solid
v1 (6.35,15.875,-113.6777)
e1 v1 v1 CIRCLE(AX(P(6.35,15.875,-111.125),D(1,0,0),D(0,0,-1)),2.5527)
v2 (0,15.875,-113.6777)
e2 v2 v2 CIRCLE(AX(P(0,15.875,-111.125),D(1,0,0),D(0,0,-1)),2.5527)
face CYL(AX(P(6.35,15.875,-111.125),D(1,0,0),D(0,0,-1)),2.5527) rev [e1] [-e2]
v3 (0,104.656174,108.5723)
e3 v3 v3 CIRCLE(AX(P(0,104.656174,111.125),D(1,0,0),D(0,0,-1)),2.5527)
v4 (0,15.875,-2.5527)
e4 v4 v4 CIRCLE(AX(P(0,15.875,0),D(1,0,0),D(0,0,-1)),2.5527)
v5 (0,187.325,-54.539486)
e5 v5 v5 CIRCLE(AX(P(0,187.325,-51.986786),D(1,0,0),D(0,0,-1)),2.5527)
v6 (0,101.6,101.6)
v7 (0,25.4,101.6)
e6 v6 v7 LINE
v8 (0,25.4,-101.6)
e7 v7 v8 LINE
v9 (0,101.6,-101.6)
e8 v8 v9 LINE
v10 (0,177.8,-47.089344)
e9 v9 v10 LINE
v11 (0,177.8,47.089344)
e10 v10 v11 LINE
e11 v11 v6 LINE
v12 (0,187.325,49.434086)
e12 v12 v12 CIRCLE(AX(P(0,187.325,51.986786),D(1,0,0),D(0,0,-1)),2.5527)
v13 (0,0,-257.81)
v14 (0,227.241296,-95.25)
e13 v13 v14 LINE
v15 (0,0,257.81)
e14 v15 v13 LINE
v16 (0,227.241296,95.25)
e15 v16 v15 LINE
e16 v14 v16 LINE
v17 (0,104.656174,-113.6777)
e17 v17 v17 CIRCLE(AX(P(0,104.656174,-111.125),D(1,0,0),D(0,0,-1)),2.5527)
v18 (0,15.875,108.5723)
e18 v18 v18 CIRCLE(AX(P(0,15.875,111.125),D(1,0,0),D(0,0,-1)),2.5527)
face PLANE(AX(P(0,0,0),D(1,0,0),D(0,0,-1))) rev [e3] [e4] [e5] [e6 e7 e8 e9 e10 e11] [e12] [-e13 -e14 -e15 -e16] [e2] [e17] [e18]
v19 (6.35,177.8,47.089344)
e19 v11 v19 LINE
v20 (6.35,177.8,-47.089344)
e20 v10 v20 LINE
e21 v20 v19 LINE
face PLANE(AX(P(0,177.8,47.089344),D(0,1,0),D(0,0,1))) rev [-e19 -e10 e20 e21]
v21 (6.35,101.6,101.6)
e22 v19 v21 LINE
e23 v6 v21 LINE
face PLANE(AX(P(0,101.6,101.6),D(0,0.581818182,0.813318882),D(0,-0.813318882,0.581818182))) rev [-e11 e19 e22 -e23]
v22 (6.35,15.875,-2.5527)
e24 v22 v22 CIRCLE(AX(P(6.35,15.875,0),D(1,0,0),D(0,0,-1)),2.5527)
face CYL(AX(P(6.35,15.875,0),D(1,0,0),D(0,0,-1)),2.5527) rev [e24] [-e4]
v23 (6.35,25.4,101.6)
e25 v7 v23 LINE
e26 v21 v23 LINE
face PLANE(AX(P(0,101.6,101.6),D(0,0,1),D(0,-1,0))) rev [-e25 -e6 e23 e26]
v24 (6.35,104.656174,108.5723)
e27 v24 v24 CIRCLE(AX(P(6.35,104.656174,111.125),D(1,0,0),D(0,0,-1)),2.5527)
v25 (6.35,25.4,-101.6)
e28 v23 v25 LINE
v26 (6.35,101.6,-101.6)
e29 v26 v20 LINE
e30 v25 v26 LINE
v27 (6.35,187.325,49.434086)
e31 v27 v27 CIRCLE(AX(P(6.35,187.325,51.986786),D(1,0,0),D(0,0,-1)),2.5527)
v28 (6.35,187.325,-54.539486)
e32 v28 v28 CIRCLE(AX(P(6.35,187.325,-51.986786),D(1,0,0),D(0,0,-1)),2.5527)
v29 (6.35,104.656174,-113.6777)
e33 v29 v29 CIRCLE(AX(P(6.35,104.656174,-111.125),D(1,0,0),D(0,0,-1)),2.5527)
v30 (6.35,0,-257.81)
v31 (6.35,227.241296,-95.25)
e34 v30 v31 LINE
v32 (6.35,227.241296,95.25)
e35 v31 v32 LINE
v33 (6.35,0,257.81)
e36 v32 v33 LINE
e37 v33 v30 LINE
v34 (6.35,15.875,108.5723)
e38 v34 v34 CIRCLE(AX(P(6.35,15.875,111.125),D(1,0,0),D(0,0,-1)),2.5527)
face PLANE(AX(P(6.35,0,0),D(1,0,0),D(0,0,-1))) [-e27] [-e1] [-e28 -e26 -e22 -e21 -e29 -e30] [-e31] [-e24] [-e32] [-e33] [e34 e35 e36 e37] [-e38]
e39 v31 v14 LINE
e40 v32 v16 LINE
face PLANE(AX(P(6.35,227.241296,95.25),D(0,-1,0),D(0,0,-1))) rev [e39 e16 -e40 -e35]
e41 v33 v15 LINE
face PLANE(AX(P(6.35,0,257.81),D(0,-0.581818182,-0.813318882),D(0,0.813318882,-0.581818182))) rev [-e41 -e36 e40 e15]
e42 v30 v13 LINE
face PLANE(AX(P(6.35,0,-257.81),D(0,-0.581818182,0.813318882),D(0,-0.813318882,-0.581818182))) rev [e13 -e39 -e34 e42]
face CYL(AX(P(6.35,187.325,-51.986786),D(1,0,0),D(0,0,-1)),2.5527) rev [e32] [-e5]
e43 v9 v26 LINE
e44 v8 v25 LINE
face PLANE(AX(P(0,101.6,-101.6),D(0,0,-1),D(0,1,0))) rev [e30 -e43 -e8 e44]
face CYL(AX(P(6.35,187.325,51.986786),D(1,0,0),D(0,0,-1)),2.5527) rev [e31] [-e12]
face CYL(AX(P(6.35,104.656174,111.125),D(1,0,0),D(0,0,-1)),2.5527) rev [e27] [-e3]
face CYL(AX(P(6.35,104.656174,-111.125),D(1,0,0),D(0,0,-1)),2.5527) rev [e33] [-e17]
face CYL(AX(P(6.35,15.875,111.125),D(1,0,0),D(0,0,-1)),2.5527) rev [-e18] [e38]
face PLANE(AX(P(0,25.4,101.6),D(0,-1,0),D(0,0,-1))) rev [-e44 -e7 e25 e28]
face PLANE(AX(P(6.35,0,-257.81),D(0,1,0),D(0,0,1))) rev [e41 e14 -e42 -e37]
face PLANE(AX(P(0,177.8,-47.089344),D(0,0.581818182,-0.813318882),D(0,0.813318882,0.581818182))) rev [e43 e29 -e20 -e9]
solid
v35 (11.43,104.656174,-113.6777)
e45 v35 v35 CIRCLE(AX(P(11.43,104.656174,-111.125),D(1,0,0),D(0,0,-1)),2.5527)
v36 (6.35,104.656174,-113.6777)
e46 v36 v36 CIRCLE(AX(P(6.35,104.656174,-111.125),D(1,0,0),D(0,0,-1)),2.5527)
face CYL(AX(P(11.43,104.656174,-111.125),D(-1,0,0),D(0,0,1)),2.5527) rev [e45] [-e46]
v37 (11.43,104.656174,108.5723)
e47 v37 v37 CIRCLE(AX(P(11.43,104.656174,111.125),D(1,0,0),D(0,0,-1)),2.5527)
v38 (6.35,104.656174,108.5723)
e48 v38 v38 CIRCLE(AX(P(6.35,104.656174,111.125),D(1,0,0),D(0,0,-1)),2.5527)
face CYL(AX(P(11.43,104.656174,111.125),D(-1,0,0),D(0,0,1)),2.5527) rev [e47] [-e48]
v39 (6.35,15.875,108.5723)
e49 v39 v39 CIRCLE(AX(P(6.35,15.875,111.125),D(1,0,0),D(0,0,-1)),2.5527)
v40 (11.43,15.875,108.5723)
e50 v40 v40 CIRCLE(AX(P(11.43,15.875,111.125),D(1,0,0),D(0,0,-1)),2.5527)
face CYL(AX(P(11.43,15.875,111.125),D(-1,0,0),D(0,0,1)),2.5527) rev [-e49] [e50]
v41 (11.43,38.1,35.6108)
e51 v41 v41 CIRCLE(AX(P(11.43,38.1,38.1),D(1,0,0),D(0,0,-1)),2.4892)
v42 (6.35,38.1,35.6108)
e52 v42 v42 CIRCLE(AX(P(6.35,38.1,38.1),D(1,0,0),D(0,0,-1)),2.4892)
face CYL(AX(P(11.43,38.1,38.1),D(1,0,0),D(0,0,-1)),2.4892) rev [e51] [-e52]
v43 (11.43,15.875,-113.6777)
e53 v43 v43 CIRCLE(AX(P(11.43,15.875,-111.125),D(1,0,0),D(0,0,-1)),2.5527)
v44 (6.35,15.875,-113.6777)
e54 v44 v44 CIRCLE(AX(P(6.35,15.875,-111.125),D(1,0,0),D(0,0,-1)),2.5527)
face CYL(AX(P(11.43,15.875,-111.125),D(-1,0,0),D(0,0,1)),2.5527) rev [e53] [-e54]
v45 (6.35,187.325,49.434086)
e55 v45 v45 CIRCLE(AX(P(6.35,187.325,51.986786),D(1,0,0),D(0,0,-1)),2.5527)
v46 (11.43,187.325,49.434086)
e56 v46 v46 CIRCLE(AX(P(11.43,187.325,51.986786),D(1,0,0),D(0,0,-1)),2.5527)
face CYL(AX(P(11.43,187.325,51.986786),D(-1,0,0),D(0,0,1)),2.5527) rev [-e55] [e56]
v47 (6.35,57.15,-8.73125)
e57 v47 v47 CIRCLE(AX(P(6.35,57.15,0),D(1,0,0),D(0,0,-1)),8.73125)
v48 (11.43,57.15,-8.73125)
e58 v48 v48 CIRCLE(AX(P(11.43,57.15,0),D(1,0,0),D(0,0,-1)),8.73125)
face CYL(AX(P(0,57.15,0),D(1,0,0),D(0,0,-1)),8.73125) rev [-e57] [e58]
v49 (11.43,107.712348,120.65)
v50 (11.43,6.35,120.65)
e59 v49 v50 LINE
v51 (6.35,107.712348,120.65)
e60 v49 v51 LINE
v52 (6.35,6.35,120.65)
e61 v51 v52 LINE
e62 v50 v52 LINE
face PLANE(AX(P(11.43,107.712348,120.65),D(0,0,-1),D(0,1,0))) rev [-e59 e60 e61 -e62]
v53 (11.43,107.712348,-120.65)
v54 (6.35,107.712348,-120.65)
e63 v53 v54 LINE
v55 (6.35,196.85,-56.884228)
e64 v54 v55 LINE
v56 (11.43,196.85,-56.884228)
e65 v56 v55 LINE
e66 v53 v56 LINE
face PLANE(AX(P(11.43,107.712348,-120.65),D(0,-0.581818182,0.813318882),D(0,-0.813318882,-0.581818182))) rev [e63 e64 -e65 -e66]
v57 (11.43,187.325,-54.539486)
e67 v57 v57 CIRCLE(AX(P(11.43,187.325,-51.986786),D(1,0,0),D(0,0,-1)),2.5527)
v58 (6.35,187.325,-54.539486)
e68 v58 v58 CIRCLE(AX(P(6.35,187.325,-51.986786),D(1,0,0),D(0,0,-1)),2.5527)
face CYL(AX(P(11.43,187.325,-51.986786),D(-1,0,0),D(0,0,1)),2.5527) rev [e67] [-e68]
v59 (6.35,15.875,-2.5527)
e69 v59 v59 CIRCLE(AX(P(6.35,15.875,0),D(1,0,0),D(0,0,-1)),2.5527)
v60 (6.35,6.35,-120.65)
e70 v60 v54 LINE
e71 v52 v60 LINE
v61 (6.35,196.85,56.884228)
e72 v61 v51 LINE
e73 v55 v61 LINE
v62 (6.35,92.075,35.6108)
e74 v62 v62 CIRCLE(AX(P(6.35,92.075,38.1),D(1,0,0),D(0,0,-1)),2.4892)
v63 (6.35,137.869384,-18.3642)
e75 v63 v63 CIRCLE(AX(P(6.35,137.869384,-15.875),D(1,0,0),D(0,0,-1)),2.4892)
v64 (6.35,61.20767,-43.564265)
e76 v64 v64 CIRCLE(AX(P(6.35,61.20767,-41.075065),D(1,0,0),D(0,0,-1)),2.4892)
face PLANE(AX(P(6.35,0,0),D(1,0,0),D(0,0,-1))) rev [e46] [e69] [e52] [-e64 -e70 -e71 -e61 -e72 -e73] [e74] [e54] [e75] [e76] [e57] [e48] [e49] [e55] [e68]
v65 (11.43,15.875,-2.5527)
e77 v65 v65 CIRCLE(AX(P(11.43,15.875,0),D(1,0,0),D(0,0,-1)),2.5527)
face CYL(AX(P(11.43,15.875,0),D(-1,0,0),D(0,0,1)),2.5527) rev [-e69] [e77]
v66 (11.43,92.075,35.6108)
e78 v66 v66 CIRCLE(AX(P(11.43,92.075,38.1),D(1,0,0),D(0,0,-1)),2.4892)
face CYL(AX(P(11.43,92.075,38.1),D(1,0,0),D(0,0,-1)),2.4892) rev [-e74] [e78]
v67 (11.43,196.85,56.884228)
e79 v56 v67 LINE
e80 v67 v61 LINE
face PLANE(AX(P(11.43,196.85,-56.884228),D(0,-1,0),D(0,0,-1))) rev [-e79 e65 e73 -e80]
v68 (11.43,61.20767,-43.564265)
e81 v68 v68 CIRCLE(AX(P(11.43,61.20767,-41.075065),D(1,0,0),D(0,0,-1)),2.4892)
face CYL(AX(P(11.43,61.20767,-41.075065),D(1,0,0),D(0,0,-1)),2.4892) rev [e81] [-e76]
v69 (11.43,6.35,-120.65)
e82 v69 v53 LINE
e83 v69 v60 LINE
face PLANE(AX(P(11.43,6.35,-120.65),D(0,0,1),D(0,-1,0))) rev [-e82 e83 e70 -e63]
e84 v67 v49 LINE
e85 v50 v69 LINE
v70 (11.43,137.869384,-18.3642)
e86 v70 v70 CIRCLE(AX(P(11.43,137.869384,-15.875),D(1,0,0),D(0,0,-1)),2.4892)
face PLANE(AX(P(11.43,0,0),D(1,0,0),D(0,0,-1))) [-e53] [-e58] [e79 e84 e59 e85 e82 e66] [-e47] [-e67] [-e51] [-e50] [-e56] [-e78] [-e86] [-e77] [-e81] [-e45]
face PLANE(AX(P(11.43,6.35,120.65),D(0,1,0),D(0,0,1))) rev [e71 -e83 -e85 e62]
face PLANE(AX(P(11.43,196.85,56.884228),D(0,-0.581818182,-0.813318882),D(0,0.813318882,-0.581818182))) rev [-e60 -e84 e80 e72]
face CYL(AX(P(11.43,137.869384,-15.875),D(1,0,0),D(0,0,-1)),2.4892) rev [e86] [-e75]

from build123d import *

# Parameters (mm, degrees)
ANGLEDBALLAST_DECKFRONT_OUTLINE_R = 2.5527
ANGLEDBALLAST_DECKFRONT_DEPTH     = 6.35
SKETCH1_R                         = 2.5527
BOSS_EXTRUDE1_DEPTH               = 5.08
SKETCH2_R                         = 8.73125
CUT_EXTRUDE1_DEPTH                = 344.853526084
F_10_CLEARANCE_HOLE1_AT_2_COUNT   = 2
F_10_CLEARANCE_HOLE1_AT_2_PITCH   = 53.975
F_10_CLEARANCE_HOLE1_AT_3_COUNT   = 2
F_10_CLEARANCE_HOLE1_AT_3_PITCH   = 113.433816282
F_10_CLEARANCE_HOLE1_AT_4_COUNT   = 2
F_10_CLEARANCE_HOLE1_AT_4_PITCH   = 82.478211039


# Read off the part's stored shape, not the designer's step: AngledBallast_DeckFront
with BuildPart() as part:
    # AngledBallast_DeckFront outline → AngledBallast_DeckFront (new body)
    with BuildSketch(Plane.YZ):
        Polygon((227.241295543, 95.25), (0, 257.81), (0, -257.81), (227.241295543, -95.25), align=None)
        with Locations((15.875, -111.125)):
            Circle(ANGLEDBALLAST_DECKFRONT_OUTLINE_R, mode=Mode.SUBTRACT)
        with Locations((104.656174089, -111.125)):
            Circle(ANGLEDBALLAST_DECKFRONT_OUTLINE_R, mode=Mode.SUBTRACT)
        with Locations((187.325, -51.986786112)):
            Circle(ANGLEDBALLAST_DECKFRONT_OUTLINE_R, mode=Mode.SUBTRACT)
        with Locations((15.875, 0)):
            Circle(ANGLEDBALLAST_DECKFRONT_OUTLINE_R, mode=Mode.SUBTRACT)
        with Locations((15.875, 111.125)):
            Circle(ANGLEDBALLAST_DECKFRONT_OUTLINE_R, mode=Mode.SUBTRACT)
        Polygon((101.6, -101.6), (25.4, -101.6), (25.4, 101.6), (101.6, 101.6), (177.8, 47.089344398), (177.8, -47.089344398), align=None, mode=Mode.SUBTRACT)
        with Locations((104.656174089, 111.125)):
            Circle(ANGLEDBALLAST_DECKFRONT_OUTLINE_R, mode=Mode.SUBTRACT)
        with Locations((187.325, 51.986786112)):
            Circle(ANGLEDBALLAST_DECKFRONT_OUTLINE_R, mode=Mode.SUBTRACT)
    extrude(amount=ANGLEDBALLAST_DECKFRONT_DEPTH)


with BuildPart() as body_2:
    # Sketch1 → Boss-Extrude1 (new body)
    with BuildSketch(Plane(origin=(6.35, 0, 0), x_dir=(0, 0, -1), z_dir=(1, 0, 0))):
        Polygon((120.65, 107.712348179), (56.884227826, 196.85), (-56.884227826, 196.85), (-120.65, 107.712348179), (-120.65, 6.35), (120.65, 6.35), align=None)
        with Locations((51.986786112, 187.325)):
            Circle(SKETCH1_R, mode=Mode.SUBTRACT)
        with Locations((111.125, 104.656174089)):
            Circle(SKETCH1_R, mode=Mode.SUBTRACT)
        with Locations((0, 15.875)):
            Circle(SKETCH1_R, mode=Mode.SUBTRACT)
        with Locations((111.125, 15.875)):
            Circle(SKETCH1_R, mode=Mode.SUBTRACT)
        with Locations((-111.125, 15.875)):
            Circle(SKETCH1_R, mode=Mode.SUBTRACT)
        with Locations((-111.125, 104.656174089)):
            Circle(SKETCH1_R, mode=Mode.SUBTRACT)
        with Locations((-51.986786112, 187.325)):
            Circle(SKETCH1_R, mode=Mode.SUBTRACT)
    extrude(amount=BOSS_EXTRUDE1_DEPTH)

    # Sketch2 → Cut-Extrude1 (cut, through all)
    with BuildSketch(Plane(origin=(11.43, 0, 0), x_dir=(0, 0, -1), z_dir=(1, 0, 0))):
        with Locations((0, 57.15)):
            Circle(SKETCH2_R)
    extrude(amount=-CUT_EXTRUDE1_DEPTH, mode=Mode.SUBTRACT)

    # Sketch5 → #10 Clearance Hole1 (revolve, cut)
    with BuildSketch(Plane(origin=(11.43, 38.1, 38.1), x_dir=(0, 0, -1), z_dir=(0, 1, 0))):
        Polygon((0, 0), (0, 13.433662253), (2.4892, 11.938), (2.4892, 0), align=None)
    f_10_clearance_hole1 = revolve(axis=Axis((17.78, 38.1, 38.1), (-1, 0, 0)), mode=Mode.SUBTRACT)

    # #10 Clearance Hole1 at 2: #10 Clearance Hole1 ×2
    with Locations(*[(0, i * F_10_CLEARANCE_HOLE1_AT_2_PITCH, 0) for i in range(1, F_10_CLEARANCE_HOLE1_AT_2_COUNT)]):
        add(f_10_clearance_hole1, mode=Mode.SUBTRACT)

    # #10 Clearance Hole1 at 3: #10 Clearance Hole1 ×2
    with Locations(*[Vector(0, 0.8795382859241794, -0.4758281240044103) * (i * F_10_CLEARANCE_HOLE1_AT_3_PITCH) for i in range(1, F_10_CLEARANCE_HOLE1_AT_3_COUNT)]):
        add(f_10_clearance_hole1, mode=Mode.SUBTRACT)

    # #10 Clearance Hole1 at 4: #10 Clearance Hole1 ×2
    with Locations(*[Vector(0, 0.28016697011361824, -0.9599512846271706) * (i * F_10_CLEARANCE_HOLE1_AT_4_PITCH) for i in range(1, F_10_CLEARANCE_HOLE1_AT_4_COUNT)]):
        add(f_10_clearance_hole1, mode=Mode.SUBTRACT)


solid = Compound([part.part, body_2.part])
